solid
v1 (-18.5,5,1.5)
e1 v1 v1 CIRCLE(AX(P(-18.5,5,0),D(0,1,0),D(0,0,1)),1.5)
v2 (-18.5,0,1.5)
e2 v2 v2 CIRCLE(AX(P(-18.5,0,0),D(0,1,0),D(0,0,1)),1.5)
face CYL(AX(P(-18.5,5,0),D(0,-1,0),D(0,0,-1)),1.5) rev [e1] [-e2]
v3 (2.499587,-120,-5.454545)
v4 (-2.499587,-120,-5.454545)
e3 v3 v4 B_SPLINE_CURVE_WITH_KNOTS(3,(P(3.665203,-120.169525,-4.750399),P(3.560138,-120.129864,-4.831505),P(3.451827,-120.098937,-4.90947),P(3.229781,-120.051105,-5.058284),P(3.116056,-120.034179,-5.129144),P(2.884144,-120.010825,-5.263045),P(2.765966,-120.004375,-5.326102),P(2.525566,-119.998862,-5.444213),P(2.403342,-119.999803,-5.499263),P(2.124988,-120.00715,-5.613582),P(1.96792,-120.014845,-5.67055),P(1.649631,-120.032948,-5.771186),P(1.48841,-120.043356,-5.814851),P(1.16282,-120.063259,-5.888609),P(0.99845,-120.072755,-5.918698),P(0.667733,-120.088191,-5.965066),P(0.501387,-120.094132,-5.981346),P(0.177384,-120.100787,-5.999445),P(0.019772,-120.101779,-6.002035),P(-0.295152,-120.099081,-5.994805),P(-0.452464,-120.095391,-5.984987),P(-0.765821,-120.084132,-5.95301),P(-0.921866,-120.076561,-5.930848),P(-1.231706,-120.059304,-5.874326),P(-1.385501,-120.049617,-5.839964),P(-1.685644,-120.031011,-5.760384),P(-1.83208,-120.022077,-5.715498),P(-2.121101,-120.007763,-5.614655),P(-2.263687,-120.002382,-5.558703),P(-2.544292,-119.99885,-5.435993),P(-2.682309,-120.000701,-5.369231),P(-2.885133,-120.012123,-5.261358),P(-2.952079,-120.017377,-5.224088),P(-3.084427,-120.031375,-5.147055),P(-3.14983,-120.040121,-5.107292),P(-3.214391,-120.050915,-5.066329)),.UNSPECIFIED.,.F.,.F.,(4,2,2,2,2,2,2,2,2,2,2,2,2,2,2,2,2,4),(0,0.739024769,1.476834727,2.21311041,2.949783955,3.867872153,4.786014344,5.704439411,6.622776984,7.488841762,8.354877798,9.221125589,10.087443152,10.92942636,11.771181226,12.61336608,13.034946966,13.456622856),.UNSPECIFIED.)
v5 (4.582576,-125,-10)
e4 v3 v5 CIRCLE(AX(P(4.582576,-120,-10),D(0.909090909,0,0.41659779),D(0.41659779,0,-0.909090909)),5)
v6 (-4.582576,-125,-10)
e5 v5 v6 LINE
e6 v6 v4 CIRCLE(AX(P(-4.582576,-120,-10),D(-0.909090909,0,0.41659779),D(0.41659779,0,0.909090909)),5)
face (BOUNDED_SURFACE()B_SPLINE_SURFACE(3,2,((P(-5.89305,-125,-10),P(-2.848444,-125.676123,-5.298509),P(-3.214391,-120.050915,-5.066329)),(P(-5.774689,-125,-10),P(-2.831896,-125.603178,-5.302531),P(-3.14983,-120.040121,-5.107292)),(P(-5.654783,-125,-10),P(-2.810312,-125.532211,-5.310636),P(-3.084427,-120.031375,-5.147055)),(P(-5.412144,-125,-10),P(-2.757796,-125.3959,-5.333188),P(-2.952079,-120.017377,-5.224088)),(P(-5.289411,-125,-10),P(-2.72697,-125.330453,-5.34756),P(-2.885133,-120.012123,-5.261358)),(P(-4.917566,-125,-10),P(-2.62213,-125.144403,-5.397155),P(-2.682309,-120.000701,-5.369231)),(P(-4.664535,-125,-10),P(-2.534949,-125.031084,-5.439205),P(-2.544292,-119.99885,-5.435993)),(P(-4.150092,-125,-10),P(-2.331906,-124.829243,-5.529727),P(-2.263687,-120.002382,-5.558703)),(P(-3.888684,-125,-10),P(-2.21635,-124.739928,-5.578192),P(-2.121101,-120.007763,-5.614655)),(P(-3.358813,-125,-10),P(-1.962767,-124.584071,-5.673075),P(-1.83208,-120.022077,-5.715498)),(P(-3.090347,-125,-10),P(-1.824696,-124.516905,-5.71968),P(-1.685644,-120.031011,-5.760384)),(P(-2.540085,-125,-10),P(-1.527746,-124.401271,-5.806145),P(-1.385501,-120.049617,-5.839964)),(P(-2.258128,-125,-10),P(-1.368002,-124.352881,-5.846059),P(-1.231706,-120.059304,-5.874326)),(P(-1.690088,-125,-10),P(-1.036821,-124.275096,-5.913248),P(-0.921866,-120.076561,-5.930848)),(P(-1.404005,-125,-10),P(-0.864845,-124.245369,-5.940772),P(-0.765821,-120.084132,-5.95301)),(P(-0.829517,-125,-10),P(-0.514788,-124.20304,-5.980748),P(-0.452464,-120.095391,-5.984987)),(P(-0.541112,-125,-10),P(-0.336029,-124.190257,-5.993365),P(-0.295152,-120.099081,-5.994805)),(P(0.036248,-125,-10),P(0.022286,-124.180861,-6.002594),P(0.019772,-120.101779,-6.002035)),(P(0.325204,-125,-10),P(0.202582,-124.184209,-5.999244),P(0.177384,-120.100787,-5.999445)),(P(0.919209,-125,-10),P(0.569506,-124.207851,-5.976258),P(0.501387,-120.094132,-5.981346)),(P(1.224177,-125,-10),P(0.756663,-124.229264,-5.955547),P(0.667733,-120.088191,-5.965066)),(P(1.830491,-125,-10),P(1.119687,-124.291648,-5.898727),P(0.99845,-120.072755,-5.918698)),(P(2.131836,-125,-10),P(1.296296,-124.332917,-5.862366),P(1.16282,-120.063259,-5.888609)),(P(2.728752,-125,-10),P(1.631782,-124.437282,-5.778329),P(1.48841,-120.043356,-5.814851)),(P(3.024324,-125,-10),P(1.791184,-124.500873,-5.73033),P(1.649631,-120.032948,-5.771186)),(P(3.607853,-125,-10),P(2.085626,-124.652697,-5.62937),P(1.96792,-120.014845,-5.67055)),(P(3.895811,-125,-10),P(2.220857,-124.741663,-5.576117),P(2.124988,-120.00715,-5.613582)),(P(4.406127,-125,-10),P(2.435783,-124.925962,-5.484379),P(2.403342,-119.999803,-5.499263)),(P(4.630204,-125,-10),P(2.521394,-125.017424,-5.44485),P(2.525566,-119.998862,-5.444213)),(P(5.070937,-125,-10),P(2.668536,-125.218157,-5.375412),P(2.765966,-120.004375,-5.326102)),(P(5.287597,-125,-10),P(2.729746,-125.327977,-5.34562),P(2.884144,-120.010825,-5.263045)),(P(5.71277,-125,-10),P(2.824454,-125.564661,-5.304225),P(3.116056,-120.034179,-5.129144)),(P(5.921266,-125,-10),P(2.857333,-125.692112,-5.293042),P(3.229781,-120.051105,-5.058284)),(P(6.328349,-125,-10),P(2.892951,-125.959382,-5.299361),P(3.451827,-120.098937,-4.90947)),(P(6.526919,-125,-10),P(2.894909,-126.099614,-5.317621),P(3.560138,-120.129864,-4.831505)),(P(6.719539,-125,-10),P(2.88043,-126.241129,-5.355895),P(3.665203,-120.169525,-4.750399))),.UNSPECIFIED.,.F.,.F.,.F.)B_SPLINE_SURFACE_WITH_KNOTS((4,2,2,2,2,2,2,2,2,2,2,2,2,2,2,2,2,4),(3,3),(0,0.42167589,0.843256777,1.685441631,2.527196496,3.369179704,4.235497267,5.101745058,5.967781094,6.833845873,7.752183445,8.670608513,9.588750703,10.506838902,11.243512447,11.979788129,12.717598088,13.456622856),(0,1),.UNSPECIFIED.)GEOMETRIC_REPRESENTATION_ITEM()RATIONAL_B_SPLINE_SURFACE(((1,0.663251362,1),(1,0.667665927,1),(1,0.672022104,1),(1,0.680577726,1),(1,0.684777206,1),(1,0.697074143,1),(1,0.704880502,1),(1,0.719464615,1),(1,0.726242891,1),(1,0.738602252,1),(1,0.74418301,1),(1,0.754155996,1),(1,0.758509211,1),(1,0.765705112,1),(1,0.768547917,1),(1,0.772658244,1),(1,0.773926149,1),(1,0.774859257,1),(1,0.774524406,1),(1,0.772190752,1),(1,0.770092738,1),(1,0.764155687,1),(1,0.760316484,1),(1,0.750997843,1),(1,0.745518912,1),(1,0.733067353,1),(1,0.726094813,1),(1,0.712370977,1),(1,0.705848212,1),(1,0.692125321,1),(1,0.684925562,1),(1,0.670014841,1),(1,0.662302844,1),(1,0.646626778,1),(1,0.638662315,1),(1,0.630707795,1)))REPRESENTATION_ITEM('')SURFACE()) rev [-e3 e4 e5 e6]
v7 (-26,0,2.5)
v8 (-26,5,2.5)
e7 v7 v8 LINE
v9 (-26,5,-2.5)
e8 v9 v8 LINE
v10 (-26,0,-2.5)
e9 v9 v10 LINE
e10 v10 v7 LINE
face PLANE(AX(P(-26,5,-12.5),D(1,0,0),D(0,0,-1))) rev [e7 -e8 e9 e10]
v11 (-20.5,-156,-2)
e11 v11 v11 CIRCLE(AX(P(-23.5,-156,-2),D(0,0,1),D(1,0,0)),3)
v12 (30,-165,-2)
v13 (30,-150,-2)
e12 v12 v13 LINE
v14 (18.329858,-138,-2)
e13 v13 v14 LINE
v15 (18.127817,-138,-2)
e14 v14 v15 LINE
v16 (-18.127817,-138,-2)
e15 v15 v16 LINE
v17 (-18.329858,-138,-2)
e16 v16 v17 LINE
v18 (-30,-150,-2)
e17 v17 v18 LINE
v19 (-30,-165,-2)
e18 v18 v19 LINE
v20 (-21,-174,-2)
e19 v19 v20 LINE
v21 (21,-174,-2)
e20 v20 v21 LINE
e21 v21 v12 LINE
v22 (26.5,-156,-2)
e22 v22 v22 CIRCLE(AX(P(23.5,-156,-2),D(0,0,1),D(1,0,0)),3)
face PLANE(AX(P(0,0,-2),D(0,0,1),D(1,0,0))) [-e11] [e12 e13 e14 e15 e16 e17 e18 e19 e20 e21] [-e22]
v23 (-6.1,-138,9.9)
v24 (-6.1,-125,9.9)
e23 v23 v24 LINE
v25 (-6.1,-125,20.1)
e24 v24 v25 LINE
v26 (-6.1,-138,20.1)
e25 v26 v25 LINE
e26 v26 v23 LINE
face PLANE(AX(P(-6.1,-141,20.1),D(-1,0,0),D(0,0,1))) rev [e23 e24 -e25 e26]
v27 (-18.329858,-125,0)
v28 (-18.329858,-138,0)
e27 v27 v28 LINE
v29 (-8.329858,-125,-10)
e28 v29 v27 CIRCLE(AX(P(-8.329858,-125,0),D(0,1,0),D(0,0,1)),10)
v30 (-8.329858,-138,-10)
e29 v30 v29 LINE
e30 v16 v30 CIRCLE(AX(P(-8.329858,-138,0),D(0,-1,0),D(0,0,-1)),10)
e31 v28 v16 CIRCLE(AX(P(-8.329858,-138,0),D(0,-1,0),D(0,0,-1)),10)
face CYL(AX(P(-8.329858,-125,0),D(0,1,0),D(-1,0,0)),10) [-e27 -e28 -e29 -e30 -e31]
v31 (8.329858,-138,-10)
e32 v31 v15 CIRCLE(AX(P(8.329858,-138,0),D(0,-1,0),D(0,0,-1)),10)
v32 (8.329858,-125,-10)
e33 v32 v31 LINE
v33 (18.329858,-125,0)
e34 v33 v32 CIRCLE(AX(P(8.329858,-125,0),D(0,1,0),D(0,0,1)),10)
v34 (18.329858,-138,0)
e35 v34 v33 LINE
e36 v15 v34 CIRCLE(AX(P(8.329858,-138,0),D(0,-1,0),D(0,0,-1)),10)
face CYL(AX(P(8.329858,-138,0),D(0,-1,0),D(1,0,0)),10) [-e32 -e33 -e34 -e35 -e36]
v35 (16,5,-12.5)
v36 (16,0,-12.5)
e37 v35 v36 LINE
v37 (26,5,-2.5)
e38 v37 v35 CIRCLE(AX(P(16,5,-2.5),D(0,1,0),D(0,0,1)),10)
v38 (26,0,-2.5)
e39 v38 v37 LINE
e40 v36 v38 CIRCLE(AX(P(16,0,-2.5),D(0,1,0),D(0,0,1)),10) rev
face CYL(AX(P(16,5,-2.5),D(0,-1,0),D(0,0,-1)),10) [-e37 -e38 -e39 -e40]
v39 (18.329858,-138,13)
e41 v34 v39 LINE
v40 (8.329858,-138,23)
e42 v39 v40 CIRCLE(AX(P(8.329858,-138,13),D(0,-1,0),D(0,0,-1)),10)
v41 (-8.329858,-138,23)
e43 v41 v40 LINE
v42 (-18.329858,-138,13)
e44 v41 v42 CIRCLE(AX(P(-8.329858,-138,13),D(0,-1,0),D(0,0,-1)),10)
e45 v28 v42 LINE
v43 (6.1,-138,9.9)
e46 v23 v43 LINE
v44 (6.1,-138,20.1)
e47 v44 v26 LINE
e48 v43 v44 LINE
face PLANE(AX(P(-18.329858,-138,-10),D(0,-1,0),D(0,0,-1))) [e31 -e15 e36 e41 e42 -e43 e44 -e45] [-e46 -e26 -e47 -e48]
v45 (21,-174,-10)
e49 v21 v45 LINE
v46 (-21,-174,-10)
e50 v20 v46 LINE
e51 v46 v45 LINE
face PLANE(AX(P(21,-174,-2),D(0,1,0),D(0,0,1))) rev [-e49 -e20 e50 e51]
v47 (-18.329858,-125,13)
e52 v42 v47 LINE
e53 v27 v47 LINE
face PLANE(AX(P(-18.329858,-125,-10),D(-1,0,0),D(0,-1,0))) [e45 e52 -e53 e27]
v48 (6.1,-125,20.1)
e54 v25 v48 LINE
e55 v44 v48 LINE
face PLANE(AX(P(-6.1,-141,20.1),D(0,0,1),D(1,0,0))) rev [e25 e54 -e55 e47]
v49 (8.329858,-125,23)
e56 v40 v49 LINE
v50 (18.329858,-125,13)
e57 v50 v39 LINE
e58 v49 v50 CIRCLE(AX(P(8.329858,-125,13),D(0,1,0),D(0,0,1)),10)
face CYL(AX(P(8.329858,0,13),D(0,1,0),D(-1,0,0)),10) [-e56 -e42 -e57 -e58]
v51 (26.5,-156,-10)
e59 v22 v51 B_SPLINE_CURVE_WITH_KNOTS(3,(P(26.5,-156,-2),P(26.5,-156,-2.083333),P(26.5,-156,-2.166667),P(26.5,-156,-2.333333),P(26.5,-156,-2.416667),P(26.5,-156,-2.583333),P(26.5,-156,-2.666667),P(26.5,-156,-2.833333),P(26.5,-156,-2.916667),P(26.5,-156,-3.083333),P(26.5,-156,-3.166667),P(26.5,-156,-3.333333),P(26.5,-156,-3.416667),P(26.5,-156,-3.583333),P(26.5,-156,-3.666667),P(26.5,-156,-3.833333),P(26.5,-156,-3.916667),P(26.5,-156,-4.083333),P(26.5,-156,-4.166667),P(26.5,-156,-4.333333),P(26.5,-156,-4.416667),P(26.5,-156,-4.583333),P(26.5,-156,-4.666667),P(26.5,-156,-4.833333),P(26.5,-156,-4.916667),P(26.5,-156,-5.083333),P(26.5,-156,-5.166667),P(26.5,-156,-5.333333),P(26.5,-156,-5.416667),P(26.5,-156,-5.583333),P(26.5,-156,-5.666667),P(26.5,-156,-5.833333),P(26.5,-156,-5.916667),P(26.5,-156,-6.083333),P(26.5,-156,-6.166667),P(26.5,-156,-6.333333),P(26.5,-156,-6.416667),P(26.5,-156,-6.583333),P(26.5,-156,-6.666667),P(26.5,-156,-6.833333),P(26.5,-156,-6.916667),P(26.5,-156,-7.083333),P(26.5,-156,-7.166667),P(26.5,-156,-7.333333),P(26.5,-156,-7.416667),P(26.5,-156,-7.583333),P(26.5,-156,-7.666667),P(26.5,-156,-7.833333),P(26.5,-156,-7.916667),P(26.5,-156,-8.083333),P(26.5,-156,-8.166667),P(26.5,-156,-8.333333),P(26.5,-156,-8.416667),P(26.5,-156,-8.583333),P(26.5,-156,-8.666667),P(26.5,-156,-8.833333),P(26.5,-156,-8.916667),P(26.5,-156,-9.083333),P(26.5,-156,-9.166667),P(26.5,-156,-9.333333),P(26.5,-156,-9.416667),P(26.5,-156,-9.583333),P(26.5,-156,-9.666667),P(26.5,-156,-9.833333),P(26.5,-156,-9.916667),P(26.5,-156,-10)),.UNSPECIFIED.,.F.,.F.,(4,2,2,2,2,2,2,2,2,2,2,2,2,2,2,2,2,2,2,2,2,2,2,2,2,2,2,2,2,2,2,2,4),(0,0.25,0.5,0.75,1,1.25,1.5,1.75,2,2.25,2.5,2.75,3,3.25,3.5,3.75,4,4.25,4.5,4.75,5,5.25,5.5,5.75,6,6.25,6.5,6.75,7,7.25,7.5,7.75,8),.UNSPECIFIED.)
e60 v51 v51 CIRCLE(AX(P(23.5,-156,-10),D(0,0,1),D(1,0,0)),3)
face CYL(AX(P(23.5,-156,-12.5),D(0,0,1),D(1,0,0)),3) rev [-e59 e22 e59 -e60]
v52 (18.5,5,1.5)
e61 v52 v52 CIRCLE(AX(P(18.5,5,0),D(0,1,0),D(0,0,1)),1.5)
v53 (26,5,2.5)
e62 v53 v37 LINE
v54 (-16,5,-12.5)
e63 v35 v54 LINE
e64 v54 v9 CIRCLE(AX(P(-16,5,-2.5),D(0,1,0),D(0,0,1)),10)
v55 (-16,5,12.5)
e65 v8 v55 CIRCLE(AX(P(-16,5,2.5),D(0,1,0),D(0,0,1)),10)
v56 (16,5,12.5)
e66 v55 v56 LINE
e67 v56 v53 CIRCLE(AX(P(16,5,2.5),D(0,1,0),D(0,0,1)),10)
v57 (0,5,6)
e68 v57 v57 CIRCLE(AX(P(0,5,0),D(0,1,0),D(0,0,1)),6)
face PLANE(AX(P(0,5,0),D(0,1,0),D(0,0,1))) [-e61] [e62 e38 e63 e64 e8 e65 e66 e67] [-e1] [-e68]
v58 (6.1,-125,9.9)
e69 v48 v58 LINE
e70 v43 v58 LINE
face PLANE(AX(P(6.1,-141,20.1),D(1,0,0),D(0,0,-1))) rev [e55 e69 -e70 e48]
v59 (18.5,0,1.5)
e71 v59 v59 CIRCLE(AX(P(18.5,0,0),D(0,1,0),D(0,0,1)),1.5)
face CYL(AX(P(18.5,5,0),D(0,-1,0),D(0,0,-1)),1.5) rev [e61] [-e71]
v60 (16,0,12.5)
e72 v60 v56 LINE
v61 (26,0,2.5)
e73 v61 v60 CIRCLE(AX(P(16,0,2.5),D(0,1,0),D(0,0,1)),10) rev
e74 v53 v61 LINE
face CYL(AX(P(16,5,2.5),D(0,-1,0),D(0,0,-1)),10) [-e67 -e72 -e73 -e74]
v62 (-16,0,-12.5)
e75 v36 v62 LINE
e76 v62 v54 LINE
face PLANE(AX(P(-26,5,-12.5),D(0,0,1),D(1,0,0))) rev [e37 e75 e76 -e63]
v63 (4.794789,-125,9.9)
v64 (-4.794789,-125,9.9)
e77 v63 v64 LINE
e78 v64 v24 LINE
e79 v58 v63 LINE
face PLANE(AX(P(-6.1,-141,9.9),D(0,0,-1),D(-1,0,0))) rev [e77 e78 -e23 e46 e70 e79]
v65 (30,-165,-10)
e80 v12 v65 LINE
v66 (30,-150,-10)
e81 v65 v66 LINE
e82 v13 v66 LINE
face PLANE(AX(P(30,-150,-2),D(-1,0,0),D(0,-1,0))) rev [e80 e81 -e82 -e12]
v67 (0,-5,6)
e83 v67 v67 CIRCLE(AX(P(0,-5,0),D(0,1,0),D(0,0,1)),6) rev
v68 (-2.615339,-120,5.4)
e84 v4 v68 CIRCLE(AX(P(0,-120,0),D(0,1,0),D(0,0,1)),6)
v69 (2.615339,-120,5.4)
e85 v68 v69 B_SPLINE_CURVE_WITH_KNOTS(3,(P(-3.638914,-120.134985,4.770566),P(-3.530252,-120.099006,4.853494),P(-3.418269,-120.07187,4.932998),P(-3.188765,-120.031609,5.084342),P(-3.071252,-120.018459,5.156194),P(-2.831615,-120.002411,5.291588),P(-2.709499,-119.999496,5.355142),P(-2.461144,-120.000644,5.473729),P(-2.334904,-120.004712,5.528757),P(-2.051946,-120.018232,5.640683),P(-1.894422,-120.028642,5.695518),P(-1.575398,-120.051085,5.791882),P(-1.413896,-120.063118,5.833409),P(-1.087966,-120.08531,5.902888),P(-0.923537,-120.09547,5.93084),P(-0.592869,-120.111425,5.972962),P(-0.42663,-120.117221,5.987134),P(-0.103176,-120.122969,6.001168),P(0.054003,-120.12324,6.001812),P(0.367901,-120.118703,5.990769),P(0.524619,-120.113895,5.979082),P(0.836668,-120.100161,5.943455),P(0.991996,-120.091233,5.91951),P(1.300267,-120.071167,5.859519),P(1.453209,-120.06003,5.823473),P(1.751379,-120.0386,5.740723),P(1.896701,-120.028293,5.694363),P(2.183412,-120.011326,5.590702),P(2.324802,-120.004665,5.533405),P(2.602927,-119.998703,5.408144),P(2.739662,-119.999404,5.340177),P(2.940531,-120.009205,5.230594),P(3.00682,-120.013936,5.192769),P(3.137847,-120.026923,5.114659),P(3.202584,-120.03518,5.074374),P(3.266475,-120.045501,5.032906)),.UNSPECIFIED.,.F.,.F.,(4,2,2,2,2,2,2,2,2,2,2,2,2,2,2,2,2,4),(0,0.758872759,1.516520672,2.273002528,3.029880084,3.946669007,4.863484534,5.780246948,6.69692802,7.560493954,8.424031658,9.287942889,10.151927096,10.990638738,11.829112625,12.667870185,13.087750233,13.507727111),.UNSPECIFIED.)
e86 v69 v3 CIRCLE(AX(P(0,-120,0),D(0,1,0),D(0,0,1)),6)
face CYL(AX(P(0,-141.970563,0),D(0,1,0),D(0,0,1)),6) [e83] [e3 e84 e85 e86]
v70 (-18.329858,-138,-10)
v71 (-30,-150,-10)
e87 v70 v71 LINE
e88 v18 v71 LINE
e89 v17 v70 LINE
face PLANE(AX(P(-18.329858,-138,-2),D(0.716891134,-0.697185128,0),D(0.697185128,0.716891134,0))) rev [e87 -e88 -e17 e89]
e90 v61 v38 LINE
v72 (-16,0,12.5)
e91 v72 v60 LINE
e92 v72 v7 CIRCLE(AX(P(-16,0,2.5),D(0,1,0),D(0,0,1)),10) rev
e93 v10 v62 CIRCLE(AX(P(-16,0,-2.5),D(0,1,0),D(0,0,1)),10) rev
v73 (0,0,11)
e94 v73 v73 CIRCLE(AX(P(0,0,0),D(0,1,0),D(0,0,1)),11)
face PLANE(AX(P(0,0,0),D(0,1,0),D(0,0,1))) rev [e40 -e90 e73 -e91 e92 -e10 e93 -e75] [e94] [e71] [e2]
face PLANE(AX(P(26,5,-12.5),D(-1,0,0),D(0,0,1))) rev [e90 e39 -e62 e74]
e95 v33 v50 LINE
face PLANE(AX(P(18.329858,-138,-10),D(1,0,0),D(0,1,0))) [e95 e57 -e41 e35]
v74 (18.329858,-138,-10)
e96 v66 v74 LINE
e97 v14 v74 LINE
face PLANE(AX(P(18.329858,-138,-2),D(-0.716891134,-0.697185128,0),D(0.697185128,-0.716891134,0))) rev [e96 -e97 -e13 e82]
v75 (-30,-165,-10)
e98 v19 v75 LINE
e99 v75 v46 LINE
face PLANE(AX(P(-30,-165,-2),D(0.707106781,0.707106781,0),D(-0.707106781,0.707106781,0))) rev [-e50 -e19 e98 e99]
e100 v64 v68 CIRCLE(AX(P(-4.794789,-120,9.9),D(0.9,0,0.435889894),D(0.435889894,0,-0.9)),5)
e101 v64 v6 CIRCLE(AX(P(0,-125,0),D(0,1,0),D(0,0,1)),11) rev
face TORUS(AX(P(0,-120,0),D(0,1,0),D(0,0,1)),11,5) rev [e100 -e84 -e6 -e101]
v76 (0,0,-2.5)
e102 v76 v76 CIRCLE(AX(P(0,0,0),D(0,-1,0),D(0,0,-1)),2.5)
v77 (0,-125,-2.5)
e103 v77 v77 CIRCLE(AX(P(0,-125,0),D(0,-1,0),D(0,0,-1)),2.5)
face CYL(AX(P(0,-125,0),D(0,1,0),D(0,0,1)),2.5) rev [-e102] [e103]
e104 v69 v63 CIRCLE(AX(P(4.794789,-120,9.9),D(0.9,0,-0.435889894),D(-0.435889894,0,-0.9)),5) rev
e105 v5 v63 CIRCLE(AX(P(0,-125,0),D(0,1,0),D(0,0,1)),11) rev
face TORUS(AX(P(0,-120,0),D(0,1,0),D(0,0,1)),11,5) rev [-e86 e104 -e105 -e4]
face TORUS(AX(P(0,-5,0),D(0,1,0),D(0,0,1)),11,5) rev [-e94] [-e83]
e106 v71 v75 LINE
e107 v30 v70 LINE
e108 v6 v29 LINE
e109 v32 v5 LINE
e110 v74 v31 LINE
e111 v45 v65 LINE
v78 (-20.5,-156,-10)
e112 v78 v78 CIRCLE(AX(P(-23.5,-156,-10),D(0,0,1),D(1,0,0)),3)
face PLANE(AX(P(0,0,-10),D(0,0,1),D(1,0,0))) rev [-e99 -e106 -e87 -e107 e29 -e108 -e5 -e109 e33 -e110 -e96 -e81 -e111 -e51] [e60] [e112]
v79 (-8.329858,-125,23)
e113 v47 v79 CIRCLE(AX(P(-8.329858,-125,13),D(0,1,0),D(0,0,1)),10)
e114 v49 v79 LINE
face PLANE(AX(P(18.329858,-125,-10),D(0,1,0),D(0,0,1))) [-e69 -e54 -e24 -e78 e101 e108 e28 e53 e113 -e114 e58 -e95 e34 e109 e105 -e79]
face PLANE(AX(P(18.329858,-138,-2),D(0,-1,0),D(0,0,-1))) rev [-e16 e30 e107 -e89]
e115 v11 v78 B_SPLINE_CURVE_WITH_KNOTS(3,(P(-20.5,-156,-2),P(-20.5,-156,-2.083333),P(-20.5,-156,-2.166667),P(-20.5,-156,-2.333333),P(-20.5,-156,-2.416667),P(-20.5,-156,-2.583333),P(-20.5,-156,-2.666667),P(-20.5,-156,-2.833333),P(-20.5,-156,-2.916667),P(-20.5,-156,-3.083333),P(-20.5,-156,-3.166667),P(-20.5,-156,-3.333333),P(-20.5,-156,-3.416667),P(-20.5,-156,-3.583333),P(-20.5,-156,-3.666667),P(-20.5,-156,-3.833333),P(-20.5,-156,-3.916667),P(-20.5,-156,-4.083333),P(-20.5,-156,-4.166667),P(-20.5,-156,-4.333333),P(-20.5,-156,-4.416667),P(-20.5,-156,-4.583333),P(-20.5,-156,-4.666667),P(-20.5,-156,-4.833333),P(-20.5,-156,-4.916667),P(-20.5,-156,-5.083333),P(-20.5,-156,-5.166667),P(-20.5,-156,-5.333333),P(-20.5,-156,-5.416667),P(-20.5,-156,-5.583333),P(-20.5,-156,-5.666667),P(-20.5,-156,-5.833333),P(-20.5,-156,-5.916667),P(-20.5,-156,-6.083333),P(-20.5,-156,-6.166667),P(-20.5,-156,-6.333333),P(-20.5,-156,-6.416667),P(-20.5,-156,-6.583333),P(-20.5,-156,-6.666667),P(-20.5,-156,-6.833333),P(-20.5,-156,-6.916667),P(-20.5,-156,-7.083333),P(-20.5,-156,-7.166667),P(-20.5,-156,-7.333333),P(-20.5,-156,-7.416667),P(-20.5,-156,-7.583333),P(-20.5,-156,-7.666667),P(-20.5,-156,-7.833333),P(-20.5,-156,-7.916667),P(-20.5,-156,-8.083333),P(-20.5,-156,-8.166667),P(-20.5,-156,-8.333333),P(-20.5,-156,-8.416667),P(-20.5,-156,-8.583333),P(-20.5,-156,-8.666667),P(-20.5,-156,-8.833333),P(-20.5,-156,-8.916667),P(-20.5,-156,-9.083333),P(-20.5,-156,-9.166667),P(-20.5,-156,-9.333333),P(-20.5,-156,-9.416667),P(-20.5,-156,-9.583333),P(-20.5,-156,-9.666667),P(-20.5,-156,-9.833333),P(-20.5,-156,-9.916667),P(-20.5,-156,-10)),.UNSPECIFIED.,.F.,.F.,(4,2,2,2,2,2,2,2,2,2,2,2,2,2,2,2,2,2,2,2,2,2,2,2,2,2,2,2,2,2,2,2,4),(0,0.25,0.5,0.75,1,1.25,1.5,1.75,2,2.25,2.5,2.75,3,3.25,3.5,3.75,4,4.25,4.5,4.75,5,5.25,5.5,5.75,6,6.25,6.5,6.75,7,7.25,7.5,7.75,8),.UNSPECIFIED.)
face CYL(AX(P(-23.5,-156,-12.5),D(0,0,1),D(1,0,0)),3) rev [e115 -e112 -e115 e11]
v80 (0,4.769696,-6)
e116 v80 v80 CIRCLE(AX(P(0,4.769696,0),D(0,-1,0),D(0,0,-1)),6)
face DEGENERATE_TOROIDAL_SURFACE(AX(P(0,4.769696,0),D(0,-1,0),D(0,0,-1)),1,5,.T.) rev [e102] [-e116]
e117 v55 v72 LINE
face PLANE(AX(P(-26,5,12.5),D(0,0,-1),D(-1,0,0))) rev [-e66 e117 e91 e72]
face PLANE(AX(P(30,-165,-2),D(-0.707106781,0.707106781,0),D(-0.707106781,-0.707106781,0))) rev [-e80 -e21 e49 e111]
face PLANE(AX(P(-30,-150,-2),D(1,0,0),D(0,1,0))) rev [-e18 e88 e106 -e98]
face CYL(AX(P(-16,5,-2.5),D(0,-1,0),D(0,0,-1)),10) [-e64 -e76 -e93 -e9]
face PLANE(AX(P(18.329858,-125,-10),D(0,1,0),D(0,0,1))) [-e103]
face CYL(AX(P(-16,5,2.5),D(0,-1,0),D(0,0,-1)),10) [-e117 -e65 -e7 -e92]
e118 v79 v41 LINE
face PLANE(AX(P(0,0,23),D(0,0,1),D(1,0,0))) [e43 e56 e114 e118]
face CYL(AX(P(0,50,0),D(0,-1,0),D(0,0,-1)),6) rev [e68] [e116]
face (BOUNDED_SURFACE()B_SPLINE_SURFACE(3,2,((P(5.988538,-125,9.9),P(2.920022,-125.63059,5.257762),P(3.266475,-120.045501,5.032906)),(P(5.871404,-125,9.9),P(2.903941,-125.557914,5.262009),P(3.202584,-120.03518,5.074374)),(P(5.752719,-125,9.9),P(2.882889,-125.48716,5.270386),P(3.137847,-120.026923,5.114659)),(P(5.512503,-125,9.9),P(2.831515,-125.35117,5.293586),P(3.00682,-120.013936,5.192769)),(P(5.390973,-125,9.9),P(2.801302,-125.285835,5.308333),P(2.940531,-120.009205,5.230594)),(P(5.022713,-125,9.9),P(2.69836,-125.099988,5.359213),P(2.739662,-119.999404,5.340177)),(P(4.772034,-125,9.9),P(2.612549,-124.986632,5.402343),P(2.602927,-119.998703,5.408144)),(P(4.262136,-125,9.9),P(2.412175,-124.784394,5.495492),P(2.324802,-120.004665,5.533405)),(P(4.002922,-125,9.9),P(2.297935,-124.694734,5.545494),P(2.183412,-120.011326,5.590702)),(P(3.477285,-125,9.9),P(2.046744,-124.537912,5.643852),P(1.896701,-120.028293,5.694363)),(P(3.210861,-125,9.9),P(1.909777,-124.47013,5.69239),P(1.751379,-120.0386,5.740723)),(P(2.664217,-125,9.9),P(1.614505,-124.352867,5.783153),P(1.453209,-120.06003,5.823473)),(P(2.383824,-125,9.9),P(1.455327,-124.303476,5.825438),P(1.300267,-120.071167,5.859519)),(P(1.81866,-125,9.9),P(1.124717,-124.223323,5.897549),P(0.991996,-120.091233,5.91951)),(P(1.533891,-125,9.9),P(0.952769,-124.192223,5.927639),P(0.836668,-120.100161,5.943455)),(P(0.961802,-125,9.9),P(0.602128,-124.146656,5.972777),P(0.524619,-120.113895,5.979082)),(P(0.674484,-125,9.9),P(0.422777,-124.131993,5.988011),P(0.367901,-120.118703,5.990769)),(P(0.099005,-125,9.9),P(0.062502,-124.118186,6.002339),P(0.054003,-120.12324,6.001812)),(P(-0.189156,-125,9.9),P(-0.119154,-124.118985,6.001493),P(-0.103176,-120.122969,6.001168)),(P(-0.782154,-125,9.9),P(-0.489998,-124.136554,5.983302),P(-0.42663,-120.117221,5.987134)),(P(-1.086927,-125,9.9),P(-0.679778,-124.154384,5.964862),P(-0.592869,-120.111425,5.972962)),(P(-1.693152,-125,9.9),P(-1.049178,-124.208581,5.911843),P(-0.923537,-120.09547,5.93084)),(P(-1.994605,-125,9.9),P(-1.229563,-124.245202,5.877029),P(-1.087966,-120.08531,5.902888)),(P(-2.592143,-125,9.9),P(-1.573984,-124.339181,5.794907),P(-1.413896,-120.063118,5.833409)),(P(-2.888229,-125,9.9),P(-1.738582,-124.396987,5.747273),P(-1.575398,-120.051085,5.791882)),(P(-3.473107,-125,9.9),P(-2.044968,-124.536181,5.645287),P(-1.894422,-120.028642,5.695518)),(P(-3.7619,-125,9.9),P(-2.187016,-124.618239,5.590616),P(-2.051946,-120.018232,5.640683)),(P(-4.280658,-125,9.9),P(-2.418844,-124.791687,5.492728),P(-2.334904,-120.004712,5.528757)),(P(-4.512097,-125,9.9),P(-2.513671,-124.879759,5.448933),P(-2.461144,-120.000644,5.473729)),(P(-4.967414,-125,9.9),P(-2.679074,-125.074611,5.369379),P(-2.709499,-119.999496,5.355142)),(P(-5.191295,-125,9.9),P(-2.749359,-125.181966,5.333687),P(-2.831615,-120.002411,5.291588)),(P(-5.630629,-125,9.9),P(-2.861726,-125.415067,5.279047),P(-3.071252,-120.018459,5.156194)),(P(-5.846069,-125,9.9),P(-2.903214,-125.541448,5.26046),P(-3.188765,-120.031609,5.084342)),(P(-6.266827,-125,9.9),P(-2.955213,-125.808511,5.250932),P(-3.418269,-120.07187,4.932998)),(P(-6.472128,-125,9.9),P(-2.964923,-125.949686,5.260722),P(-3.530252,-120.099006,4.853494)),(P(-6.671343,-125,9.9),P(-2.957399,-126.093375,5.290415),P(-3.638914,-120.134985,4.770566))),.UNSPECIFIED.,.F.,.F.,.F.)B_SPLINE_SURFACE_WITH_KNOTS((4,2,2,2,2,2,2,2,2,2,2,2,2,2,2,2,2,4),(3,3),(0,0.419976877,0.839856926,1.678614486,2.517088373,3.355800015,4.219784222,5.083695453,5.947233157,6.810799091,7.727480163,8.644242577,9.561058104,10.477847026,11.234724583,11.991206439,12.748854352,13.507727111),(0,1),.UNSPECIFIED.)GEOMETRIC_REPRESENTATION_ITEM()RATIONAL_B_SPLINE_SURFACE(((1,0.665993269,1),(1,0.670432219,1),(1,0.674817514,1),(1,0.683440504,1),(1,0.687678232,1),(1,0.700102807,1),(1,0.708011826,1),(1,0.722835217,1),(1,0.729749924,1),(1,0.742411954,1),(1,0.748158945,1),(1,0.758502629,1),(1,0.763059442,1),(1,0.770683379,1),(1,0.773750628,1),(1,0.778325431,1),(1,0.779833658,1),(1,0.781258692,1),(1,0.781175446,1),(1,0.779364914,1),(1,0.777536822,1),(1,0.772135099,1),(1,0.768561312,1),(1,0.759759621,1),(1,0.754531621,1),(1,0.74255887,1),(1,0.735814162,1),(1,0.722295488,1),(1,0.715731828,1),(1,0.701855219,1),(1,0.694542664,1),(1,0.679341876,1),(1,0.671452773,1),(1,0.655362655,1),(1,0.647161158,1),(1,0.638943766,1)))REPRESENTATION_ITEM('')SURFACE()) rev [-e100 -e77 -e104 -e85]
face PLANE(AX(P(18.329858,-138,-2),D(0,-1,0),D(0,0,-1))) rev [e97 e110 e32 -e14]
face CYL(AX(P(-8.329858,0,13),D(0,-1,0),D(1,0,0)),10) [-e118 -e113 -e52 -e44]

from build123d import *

# Parameters (mm, degrees)
SKETCH_1_W           = 52
SKETCH_1_H           = 25
SKETCH_1_R           = 1.5
EXTRUDE_1_DEPTH      = 5
SKETCH_2_R           = 4
SKETCH_2_R_2         = 2.5
EXTRUDE_2_DEPTH      = 125
FILLET_1_R           = 10
SKETCH_2_3_R         = 6
SKETCH_2_3_R_2       = 4
EXTRUDE_4_DEPTH      = 125
FILLET_3_R           = 5
CUT_EXTRUDE_START    = -50
SKETCH_2_4_R         = 6
CUT_EXTRUDE_1_DEPTH  = 50
FILLET_4_R           = 5
EXTRUDE_5_DEPTH      = 23
EXTRUDE_5_DEPTH_BACK = 10
SKETCH_3_W           = 36.659715442
SKETCH_3_H           = 13
SKETCH_4_W           = 12.2
SKETCH_4_H           = 10.2
CUT_EXTRUDE_2_DEPTH  = 16
FILLET_5_R           = 10
EXTRUDE_6_DEPTH      = 8
FILLET_9_R           = 5
SKETCH_10_W          = 42
SKETCH_10_H          = 8
EXTRUDE_7_DEPTH      = 3
SKETCH_8_R           = 3
CUT_EXTRUDE_5_DEPTH  = 179.328348954


with BuildPart() as part:
    # 草图1 → 凸台-拉伸1 (new body)
    with BuildSketch(Plane(origin=(0, 0, 0), x_dir=(1, 0, 0), z_dir=(0, 1, 0))):
        Rectangle(SKETCH_1_W, SKETCH_1_H)
        with Locations(Location((-18.5, 0, 0), (0, 0, 270))):
            Circle(SKETCH_1_R, mode=Mode.SUBTRACT)
        with Locations(Location((18.5, 0, 0), (0, 0, 270))):
            Circle(SKETCH_1_R, mode=Mode.SUBTRACT)
    extrude(amount=EXTRUDE_1_DEPTH)

    # 草图2 → 凸台-拉伸2 (add)
    with BuildSketch(Plane.XZ):
        with Locations(Location((0, 0, 0), (0, 0, 90))):
            Circle(SKETCH_2_R)
        with Locations(Location((0, 0, 0), (0, 0, 270))):
            Circle(SKETCH_2_R_2, mode=Mode.SUBTRACT)
    extrude(amount=EXTRUDE_2_DEPTH)

    # 圆角1
    fillet_1_edges = [part.edges().sort_by_distance(p)[0] for p in [
        (26, 2.5, 12.5),
        (-26, 2.5, 12.5),
        (-26, 2.5, -12.5),
        (26, 2.5, -12.5),
    ]]
    fillet(fillet_1_edges, radius=FILLET_1_R)

    # 草图2<3> → 凸台-拉伸4 (add)
    with BuildSketch(Plane.XZ):
        with Locations(Location((0, 0, 0), (0, 0, 90))):
            Circle(SKETCH_2_3_R)
        Circle(SKETCH_2_3_R_2, mode=Mode.SUBTRACT)
    extrude(amount=EXTRUDE_4_DEPTH)

    # 圆角3
    fillet_3_edges = [part.edges().sort_by_distance(p)[0] for p in [
        (0, 0, -6),
    ]]
    fillet(fillet_3_edges, radius=FILLET_3_R)

    # 草图2<4> → 切除-拉伸1 (cut)
    with BuildSketch(Plane.XZ.offset(CUT_EXTRUDE_START)):
        with Locations(Location((0, 0, 0), (0, 0, 90))):
            Circle(SKETCH_2_4_R)
    extrude(amount=CUT_EXTRUDE_1_DEPTH, mode=Mode.SUBTRACT)

    # 圆角4
    # the kernel refuses this fillet: 5 mm, written as the material it adds along each edge
    with BuildSketch(Plane(origin=(0, 0, 0), x_dir=(0, 0, 1), z_dir=(1, 0, 0))) as fillet_4_piece_1:
        with BuildLine():
            CenterArc((1, -4.769696007), FILLET_4_R, 0, 72.542396876)
            Line((2.5, 0), (2.53, 0.09539392))
            ThreePointArc((2.53, 0.09539392), (4.25, 0.1), (6, 0.1))
            Line((6, 0.1), (6.1, 0))
            Line((6.1, 0), (6.1, -4.769696007))
            Line((6.1, -4.769696007), (6, -4.769696007))
        make_face()
    revolve(axis=Axis((0, 0, 0), (0, -1, 0)))

    # 草图3 → 凸台-拉伸5 (add, two sides: drawn at the far end of the back side and taken through both)
    with BuildSketch(Plane.XY.offset(-EXTRUDE_5_DEPTH_BACK)):
        with Locations((0, -131.5)):
            Rectangle(SKETCH_3_W, SKETCH_3_H)
    extrude(amount=EXTRUDE_5_DEPTH + EXTRUDE_5_DEPTH_BACK)

    # 草图4 → 切除-拉伸2 (cut)
    with BuildSketch(Plane(origin=(0, -125, 0), x_dir=(1, 0, 0), z_dir=(0, 1, 0))):
        with Locations((0, -15)):
            Rectangle(SKETCH_4_W, SKETCH_4_H)
    extrude(amount=-CUT_EXTRUDE_2_DEPTH, mode=Mode.SUBTRACT)

    # 圆角5
    fillet_5_edges = [part.edges().sort_by_distance(p)[0] for p in [
        (18.329857721, -131.5, -10),
        (-18.329857721, -131.5, -10),
        (18.329857721, -131.5, 23),
        (-18.329857721, -131.5, 23),
    ]]
    fillet(fillet_5_edges, radius=FILLET_5_R)

    # 草图5 → 凸台-拉伸6 (add)
    with BuildSketch(Plane.XY.offset(-10)):
        Polygon((-18.329857721, -138), (-30, -150), (-30, -165), (-21, -174), (0, -174), (21, -174), (30, -165), (30, -150), (18.329857721, -138), align=None)
    extrude(amount=EXTRUDE_6_DEPTH)

    # 圆角9
    fillet_9_edges = [part.edges().sort_by_distance(p)[0] for p in [
        (0, -125, -6),
    ]]
    fillet(fillet_9_edges, radius=FILLET_9_R)

    # 草图10 → 凸台-拉伸7 (add)
    with BuildSketch(Plane.XZ.offset(174)):
        with Locations((0, -6)):
            Rectangle(SKETCH_10_W, SKETCH_10_H)
    extrude(amount=-EXTRUDE_7_DEPTH)

    # 草图8 → 切除-拉伸5 (cut, through all)
    with BuildSketch(Plane.XY.offset(-2)):
        with Locations((23.5, -156)):
            Circle(SKETCH_8_R)
        with Locations((-23.5, -156)):
            Circle(SKETCH_8_R)
    extrude(amount=-CUT_EXTRUDE_5_DEPTH, mode=Mode.SUBTRACT)


solid = part.part
